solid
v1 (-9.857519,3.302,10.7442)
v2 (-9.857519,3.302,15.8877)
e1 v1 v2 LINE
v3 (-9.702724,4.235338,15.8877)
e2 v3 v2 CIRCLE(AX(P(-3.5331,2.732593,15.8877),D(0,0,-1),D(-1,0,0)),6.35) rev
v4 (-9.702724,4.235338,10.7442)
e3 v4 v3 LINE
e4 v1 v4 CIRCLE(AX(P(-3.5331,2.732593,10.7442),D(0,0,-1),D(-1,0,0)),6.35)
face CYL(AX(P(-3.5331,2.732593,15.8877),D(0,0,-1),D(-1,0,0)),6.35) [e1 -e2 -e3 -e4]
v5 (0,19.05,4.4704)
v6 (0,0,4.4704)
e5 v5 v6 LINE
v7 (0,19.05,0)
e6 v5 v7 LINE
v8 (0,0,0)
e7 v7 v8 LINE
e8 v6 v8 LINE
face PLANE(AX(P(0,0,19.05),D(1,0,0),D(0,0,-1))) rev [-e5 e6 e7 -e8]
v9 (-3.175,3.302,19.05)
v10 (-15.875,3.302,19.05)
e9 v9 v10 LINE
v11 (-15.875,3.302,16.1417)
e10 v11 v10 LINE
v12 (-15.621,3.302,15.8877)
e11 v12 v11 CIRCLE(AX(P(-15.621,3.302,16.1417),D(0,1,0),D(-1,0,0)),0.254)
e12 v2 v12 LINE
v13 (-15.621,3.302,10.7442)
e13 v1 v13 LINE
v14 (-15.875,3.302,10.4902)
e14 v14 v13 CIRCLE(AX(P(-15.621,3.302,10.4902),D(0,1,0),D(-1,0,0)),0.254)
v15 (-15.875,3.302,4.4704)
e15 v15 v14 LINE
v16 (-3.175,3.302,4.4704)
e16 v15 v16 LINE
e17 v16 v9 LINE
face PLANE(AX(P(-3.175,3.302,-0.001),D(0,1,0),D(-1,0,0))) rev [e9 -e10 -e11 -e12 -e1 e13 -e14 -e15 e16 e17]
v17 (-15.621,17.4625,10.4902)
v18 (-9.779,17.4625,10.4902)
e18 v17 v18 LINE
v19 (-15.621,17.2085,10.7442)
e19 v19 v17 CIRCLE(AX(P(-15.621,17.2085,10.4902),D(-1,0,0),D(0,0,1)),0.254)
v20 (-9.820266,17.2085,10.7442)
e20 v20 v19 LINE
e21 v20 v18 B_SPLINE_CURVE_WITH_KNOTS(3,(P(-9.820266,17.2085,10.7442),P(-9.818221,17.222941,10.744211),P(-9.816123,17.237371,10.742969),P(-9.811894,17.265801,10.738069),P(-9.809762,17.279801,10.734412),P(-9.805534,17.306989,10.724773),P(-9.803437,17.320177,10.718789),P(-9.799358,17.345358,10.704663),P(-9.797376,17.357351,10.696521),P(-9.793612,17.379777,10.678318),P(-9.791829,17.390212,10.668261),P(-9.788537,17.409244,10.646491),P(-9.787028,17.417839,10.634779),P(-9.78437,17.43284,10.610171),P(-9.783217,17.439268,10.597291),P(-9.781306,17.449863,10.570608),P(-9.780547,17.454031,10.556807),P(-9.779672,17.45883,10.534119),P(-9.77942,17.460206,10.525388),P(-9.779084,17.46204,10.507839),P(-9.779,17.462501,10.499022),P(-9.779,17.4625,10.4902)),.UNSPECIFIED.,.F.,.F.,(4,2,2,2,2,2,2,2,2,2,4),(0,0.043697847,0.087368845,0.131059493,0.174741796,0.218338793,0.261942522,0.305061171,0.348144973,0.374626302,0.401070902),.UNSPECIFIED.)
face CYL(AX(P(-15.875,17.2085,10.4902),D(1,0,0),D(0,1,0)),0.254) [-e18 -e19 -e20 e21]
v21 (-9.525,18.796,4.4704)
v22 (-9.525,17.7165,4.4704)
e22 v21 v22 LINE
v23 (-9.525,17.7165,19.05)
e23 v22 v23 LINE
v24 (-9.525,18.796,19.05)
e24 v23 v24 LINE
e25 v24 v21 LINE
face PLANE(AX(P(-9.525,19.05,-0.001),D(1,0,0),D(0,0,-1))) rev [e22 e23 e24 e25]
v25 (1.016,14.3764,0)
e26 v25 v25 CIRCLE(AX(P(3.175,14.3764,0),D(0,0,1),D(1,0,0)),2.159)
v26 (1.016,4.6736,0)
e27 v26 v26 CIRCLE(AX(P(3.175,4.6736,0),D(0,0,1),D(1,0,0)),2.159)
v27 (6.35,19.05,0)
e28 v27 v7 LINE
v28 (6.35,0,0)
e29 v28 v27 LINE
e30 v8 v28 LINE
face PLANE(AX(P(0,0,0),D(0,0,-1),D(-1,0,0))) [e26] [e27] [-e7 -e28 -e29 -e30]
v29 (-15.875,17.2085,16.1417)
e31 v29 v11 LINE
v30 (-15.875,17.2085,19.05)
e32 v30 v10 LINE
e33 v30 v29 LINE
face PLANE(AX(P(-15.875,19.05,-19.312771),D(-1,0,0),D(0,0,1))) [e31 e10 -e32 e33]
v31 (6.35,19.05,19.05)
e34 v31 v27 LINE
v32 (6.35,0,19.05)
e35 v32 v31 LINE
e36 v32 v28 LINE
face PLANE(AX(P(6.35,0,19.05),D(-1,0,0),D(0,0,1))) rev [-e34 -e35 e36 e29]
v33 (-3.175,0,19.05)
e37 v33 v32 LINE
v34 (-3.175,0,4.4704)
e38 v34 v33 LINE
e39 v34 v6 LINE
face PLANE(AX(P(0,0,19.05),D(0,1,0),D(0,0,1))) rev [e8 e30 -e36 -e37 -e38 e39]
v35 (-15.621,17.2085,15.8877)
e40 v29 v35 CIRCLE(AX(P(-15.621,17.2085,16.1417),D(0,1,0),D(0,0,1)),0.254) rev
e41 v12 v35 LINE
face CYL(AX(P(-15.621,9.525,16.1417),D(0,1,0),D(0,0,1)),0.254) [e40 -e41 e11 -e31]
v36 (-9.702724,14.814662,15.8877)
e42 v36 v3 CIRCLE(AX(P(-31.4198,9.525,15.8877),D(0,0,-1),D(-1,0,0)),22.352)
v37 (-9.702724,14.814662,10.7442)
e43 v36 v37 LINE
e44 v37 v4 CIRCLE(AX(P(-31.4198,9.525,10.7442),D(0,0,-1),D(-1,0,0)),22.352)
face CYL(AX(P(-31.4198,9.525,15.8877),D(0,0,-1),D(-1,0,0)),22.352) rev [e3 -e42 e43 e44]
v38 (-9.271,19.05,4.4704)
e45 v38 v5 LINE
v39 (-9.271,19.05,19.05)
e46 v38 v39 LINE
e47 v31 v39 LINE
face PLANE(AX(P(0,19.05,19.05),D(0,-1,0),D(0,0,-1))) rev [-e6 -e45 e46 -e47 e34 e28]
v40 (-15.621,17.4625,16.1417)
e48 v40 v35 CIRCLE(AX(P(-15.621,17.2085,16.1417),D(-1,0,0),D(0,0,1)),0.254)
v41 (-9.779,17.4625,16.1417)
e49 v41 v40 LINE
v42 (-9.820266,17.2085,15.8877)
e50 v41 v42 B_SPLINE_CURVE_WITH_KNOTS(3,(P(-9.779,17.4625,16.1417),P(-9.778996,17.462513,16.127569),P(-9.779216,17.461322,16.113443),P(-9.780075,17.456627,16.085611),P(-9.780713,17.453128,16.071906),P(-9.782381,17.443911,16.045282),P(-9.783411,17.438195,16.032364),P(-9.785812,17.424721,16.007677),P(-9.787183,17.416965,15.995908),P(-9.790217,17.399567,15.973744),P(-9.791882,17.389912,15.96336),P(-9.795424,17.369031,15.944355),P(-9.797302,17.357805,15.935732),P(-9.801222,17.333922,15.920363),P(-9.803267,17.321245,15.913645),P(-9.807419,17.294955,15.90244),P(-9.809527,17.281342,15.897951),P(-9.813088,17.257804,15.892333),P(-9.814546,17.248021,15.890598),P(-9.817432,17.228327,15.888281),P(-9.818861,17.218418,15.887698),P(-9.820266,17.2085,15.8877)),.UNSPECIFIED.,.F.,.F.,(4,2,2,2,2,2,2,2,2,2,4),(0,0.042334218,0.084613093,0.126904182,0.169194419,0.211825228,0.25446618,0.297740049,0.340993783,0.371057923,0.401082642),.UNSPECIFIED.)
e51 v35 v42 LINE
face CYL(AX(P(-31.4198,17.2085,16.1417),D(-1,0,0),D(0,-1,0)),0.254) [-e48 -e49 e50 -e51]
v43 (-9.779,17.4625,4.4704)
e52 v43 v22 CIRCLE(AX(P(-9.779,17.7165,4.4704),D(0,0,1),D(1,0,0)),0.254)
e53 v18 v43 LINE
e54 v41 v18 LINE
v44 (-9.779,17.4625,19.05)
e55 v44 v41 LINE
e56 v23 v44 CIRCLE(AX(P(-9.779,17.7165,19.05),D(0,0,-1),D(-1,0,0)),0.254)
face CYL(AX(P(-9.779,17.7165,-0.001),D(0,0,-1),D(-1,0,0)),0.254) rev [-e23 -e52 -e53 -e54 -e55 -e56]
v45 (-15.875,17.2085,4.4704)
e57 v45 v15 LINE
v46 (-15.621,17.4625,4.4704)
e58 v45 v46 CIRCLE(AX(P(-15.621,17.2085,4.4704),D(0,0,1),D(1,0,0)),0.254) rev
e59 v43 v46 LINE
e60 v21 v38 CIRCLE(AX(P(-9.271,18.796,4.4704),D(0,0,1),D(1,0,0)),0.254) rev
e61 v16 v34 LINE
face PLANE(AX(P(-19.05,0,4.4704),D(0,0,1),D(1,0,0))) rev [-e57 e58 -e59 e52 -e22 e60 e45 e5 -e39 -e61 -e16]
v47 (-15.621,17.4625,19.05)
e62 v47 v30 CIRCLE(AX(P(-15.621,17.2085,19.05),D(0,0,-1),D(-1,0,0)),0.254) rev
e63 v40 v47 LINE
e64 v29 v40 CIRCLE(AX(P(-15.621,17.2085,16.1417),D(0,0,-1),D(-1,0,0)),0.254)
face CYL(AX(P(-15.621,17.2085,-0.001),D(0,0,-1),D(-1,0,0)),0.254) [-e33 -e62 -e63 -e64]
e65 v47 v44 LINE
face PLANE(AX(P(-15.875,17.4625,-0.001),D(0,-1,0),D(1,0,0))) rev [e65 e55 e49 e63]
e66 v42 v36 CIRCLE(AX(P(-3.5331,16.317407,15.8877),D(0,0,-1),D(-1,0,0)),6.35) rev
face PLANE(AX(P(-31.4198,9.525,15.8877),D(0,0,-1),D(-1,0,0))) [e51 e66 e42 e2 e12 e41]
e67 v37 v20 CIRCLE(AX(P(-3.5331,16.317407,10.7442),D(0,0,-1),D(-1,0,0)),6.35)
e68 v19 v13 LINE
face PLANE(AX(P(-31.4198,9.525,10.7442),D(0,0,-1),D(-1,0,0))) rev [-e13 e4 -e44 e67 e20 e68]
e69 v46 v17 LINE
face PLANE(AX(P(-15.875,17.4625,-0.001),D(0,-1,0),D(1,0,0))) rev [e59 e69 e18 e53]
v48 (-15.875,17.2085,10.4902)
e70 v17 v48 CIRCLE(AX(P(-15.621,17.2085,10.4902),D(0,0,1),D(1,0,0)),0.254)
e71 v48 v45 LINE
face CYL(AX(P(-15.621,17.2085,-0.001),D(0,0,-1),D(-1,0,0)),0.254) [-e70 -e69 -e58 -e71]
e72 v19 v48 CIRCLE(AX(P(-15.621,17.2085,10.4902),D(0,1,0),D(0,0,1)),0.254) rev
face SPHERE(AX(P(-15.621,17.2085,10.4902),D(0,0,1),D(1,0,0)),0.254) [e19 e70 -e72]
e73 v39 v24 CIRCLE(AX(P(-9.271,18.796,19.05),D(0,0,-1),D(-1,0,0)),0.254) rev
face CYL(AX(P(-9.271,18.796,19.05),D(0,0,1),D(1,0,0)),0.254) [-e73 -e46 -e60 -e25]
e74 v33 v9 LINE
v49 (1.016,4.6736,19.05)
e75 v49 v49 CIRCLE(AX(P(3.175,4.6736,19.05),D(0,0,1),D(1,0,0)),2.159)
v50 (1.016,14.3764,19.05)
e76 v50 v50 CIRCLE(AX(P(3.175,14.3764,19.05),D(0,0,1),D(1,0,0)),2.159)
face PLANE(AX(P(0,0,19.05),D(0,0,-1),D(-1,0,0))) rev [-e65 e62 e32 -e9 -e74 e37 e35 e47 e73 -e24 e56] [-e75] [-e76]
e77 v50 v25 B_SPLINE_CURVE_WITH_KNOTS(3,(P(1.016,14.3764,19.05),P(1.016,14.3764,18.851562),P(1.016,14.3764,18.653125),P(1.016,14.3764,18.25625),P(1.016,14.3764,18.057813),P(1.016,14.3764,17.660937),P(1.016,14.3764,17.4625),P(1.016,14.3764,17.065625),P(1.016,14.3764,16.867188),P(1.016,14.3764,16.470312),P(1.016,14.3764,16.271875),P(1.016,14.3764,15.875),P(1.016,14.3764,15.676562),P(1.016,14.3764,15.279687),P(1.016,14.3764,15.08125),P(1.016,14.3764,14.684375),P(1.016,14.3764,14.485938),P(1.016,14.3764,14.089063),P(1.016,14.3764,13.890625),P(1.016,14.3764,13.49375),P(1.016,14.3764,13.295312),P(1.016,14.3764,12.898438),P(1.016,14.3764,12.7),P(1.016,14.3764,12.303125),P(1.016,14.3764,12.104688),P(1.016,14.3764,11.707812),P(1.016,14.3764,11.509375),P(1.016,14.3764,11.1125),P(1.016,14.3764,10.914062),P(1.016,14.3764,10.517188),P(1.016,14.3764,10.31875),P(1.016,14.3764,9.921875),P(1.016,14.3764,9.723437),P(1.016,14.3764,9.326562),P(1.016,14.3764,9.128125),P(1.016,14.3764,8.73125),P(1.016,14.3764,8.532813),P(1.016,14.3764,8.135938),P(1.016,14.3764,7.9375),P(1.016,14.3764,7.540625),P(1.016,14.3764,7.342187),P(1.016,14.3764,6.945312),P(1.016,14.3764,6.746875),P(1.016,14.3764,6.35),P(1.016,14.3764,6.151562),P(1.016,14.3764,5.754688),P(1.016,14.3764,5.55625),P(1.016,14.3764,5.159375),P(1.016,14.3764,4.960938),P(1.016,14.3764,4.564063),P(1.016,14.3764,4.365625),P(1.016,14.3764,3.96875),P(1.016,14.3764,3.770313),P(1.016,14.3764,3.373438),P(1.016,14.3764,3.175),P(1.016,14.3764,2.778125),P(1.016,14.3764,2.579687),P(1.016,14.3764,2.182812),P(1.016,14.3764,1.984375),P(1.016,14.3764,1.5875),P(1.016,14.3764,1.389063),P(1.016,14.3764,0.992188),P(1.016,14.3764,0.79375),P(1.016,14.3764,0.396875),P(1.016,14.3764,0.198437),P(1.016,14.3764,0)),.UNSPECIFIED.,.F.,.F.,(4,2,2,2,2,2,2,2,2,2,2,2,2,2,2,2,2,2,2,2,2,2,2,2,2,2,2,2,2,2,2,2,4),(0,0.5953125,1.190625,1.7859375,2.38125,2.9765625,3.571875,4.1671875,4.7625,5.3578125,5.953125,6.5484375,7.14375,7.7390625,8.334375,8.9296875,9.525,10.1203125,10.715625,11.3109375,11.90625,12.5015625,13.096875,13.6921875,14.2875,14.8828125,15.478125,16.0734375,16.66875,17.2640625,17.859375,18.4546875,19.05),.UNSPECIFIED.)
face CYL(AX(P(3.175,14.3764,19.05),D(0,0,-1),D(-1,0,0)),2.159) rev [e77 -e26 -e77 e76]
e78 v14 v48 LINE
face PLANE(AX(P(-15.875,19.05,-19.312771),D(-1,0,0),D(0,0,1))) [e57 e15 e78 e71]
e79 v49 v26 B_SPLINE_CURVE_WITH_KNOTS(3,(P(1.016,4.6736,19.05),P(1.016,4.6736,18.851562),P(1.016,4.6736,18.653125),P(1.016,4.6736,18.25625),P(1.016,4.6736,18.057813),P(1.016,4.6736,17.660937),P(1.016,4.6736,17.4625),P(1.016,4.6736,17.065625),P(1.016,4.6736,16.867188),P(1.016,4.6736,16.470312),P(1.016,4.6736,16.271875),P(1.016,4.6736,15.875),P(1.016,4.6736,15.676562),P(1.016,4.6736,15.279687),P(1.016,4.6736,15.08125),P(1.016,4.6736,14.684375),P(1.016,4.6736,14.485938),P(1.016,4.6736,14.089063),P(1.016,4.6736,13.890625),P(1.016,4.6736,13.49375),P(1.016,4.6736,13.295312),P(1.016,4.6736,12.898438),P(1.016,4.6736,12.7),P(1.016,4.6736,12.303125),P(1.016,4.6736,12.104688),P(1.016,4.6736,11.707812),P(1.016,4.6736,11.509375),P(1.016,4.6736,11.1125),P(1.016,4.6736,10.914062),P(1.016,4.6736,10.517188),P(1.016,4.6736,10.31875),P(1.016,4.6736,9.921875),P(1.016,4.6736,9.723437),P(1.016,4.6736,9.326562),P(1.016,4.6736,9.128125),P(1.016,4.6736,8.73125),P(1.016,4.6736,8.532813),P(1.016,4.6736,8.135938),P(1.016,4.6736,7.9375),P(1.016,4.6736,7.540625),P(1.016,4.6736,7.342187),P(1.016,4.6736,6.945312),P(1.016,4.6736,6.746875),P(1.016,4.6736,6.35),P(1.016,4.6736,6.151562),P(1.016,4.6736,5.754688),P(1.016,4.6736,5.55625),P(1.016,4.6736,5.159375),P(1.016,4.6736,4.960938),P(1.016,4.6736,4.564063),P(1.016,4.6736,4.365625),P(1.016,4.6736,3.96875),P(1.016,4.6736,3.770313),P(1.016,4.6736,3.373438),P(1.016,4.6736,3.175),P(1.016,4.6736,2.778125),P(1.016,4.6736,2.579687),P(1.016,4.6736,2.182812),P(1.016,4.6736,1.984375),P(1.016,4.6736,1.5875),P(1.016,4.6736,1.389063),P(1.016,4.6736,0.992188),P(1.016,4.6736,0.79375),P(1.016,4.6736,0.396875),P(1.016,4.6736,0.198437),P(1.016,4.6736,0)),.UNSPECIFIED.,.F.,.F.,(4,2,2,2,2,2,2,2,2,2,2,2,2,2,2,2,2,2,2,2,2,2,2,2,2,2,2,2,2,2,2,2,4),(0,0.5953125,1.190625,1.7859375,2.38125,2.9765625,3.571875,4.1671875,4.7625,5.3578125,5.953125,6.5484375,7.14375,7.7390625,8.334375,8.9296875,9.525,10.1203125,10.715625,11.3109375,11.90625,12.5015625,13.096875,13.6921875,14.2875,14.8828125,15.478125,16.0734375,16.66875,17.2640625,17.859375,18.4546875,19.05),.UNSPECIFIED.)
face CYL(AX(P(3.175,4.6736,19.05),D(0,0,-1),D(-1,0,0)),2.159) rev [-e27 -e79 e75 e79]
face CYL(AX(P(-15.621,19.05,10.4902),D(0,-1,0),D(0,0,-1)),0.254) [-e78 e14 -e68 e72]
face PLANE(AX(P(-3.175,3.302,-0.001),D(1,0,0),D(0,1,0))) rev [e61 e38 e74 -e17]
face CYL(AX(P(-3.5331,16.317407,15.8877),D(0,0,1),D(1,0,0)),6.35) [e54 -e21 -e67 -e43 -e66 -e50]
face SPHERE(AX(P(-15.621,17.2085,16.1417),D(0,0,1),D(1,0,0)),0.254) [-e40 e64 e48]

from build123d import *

# Parameters (mm, degrees)
SKETCH1_W           = 6.35
SKETCH1_H           = 19.05
SKETCH1_R           = 2.159
BOSS_EXTRUDE1_DEPTH = 19.05
SKETCH2_W           = 14.5796
SKETCH2_H           = 19.05
BOSS_EXTRUDE2_DEPTH = 19.05
SKETCH3_R           = 22.352
CUT_EXTRUDE1_DEPTH  = 2.57175
CUT_EXTRUDE2_REACH  = 34.996
SKETCH4_W           = 3.175
SKETCH4_H           = 19.05
CUT_EXTRUDE3_REACH  = 33.27
SKETCH6_W           = 6.35
SKETCH6_H           = 1.5875
FILLET2_R           = 0.254
FILLET3_START       = -15.6210001
FILLET3_DEPTH       = 5.918275981
FILLET3_START_2     = 9
FILLET3_2_DEPTH     = 8
CUT_EXTRUDE4_START  = -14.5796
CUT_EXTRUDE4_DEPTH  = 14.5796


with BuildPart() as part:
    # Sketch1 → Boss-Extrude1 (new body)
    with BuildSketch(Plane.XY):
        with Locations((3.175, 9.525)):
            Rectangle(SKETCH1_W, SKETCH1_H)
        with Locations(Location((3.175, 14.3764, 0), (0, 0, 180))):
            Circle(SKETCH1_R, mode=Mode.SUBTRACT)
        with Locations(Location((3.175, 4.6736, 0), (0, 0, 180))):
            Circle(SKETCH1_R, mode=Mode.SUBTRACT)
    extrude(amount=BOSS_EXTRUDE1_DEPTH)

    # Sketch2 → Boss-Extrude2 (add)
    with BuildSketch(Plane.ZY):
        with Locations((11.7602, 9.525)):
            Rectangle(SKETCH2_W, SKETCH2_H)
    extrude(amount=BOSS_EXTRUDE2_DEPTH)

    # Sketch3 → Cut-Extrude1 (cut, symmetric)
    with BuildSketch(Plane(origin=(0, 0, 13.31595), x_dir=(-1, 0, 0), z_dir=(0, 0, -1))):
        with Locations((31.4198, 9.525)):
            Circle(SKETCH3_R)
    extrude(amount=CUT_EXTRUDE1_DEPTH, both=True, mode=Mode.SUBTRACT)

    # Cut-Extrude2: up to this face of the body (flat: up to its plane)
    cut_extrude2_end = Plane(part.part.faces().sort_by_distance((3.175, 9.525, 0))[0])
    # Sketch4 → Cut-Extrude2 (cut, up to the picked face)
    with BuildSketch(Plane(origin=(0, 0, 19.05), x_dir=(-1, 0, 0), z_dir=(0, 0, -1)), mode=Mode.PRIVATE) as cut_extrude2_sk1:
        with Locations((17.4625, 9.525)):
            Rectangle(SKETCH4_W, SKETCH4_H)
    cut_extrude2_tool1 = split(extrude(cut_extrude2_sk1.sketch, amount=CUT_EXTRUDE2_REACH, mode=Mode.PRIVATE), bisect_by=cut_extrude2_end, keep=Keep.BOTH, mode=Mode.PRIVATE)
    add(cut_extrude2_tool1.solids().sort_by(Axis((-17.4625, 9.525, 19.05), (0, 0, -1)))[0], mode=Mode.SUBTRACT)

    # Sketch6 → Cut-Extrude3 (cut, up to next)
    with BuildSketch(Plane.XY.offset(19.05), mode=Mode.PRIVATE) as cut_extrude3_sk1:
        with Locations((-12.7, 0.79375)):
            Rectangle(SKETCH6_W, SKETCH6_H)
    cut_extrude3_tool1 = extrude(cut_extrude3_sk1.sketch, amount=-CUT_EXTRUDE3_REACH, mode=Mode.PRIVATE) & part.part
    # Sketch6 → Cut-Extrude3 (cut, up to next)
    with BuildSketch(Plane.XY.offset(19.05), mode=Mode.PRIVATE) as cut_extrude3_sk2:
        with Locations((-12.7, 18.25625)):
            Rectangle(SKETCH6_W, SKETCH6_H)
    cut_extrude3_tool2 = extrude(cut_extrude3_sk2.sketch, amount=-CUT_EXTRUDE3_REACH, mode=Mode.PRIVATE) & part.part
    add(cut_extrude3_tool1.solids().sort_by_distance((-12.7, 0.79375, 19.05))[0], mode=Mode.SUBTRACT)
    add(cut_extrude3_tool2.solids().sort_by_distance((-12.7, 18.25625, 19.05))[0], mode=Mode.SUBTRACT)

    # Fillet2
    fillet2_edges = [part.edges().sort_by_distance(p)[0] for p in [
        (-13.199816574, 1.5875, 10.7442),
        (-15.875, 1.5875, 7.6073),
        (-13.199816574, 1.5875, 15.8877),
        (-15.875, 1.5875, 17.46885),
        (-9.525, 1.5875, 11.7602),
        (-9.525, 0, 11.7602),
        (-13.199816574, 17.4625, 10.7442),
        (-9.525, 19.05, 11.7602),
        (-9.525, 17.4625, 11.7602),
        (-13.199816574, 17.4625, 15.8877),
        (-15.875, 17.4625, 7.6073),
        (-15.875, 17.4625, 17.46885),
        (-15.875, 9.525, 15.8877),
        (-15.875, 9.525, 10.7442),
    ]]
    fillet(fillet2_edges, radius=FILLET2_R)

    # Fillet3: read off the stored shape, not the designer's step
    # Fillet3 outline → Fillet3 (cut)
    with BuildSketch(Plane.YZ.offset(FILLET3_START)):
        with BuildLine():
            ThreePointArc((17.2085, 10.7442), (17.388105122, 10.669805122), (17.4625, 10.4902))
            Line((17.4625, 10.4902), (17.4625, 16.1417))
            ThreePointArc((17.4625, 16.1417), (17.388105122, 15.962094878), (17.2085, 15.8877))
            Line((17.2085, 15.8877), (1.8415, 15.8877))
            ThreePointArc((1.8415, 15.8877), (1.661894878, 15.962094878), (1.5875, 16.1417))
            Line((1.5875, 16.1417), (1.5875, 10.4902))
            ThreePointArc((1.5875, 10.4902), (1.661894878, 10.669805122), (1.8415, 10.7442))
            Line((1.8415, 10.7442), (17.2085, 10.7442))
        make_face()
    extrude(amount=FILLET3_DEPTH, mode=Mode.SUBTRACT)

    # Fillet3 2 outline → Fillet3 2 (add)
    with BuildSketch(Plane.XY.offset(FILLET3_START_2)):
        with BuildLine():
            ThreePointArc((-9.702724219, 4.235338054), (-9.880467378, 2.915439177), (-9.778999483, 1.587497181))
            Line((-9.778999483, 1.587497181), (-9.702724119, 1.5875))
            Line((-9.702724119, 1.5875), (-9.702724219, 4.235338054))
        make_face()
        with BuildLine():
            Line((-9.702724119, 17.4625), (-9.778999483, 17.462502819))
            ThreePointArc((-9.778999483, 17.462502819), (-9.880467378, 16.134560823), (-9.702724219, 14.814661946))
            Line((-9.702724219, 14.814661946), (-9.702724119, 17.4625))
        make_face()
    extrude(amount=FILLET3_2_DEPTH)

    # Cut-Extrude4: read off the stored shape, not the designer's step
    # Cut-Extrude4 outline → Cut-Extrude4 (cut)
    with BuildSketch(Plane.XY.offset(19.05).offset(CUT_EXTRUDE4_START)):
        with BuildLine():
            Line((-9.271, 0), (-3.175, 0))
            Line((-3.175, 0), (-3.175, 3.302))
            Line((-3.175, 3.302), (-9.857519432, 3.302))
            ThreePointArc((-9.857519432, 3.302), (-9.876451593, 2.442083536), (-9.778999483, 1.587497181))
            ThreePointArc((-9.778999483, 1.587497181), (-9.599394878, 1.513105122), (-9.525, 1.3335))
            Line((-9.525, 1.3335), (-9.525, 0.254))
            ThreePointArc((-9.525, 0.254), (-9.450605122, 0.074394878), (-9.271, 0))
        make_face()
        with BuildLine():
            ThreePointArc((-9.778999483, 1.587497181), (-9.876451593, 2.442083536), (-9.857519432, 3.302))
            Line((-9.857519432, 3.302), (-15.875, 3.302))
            Line((-15.875, 3.302), (-15.875, 1.8415))
            ThreePointArc((-15.875, 1.8415), (-15.800605122, 1.661894878), (-15.621, 1.5875))
            Line((-15.621, 1.5875), (-9.778999483, 1.587497181))
        make_face()
    extrude(amount=CUT_EXTRUDE4_DEPTH, mode=Mode.SUBTRACT)


solid = part.part
